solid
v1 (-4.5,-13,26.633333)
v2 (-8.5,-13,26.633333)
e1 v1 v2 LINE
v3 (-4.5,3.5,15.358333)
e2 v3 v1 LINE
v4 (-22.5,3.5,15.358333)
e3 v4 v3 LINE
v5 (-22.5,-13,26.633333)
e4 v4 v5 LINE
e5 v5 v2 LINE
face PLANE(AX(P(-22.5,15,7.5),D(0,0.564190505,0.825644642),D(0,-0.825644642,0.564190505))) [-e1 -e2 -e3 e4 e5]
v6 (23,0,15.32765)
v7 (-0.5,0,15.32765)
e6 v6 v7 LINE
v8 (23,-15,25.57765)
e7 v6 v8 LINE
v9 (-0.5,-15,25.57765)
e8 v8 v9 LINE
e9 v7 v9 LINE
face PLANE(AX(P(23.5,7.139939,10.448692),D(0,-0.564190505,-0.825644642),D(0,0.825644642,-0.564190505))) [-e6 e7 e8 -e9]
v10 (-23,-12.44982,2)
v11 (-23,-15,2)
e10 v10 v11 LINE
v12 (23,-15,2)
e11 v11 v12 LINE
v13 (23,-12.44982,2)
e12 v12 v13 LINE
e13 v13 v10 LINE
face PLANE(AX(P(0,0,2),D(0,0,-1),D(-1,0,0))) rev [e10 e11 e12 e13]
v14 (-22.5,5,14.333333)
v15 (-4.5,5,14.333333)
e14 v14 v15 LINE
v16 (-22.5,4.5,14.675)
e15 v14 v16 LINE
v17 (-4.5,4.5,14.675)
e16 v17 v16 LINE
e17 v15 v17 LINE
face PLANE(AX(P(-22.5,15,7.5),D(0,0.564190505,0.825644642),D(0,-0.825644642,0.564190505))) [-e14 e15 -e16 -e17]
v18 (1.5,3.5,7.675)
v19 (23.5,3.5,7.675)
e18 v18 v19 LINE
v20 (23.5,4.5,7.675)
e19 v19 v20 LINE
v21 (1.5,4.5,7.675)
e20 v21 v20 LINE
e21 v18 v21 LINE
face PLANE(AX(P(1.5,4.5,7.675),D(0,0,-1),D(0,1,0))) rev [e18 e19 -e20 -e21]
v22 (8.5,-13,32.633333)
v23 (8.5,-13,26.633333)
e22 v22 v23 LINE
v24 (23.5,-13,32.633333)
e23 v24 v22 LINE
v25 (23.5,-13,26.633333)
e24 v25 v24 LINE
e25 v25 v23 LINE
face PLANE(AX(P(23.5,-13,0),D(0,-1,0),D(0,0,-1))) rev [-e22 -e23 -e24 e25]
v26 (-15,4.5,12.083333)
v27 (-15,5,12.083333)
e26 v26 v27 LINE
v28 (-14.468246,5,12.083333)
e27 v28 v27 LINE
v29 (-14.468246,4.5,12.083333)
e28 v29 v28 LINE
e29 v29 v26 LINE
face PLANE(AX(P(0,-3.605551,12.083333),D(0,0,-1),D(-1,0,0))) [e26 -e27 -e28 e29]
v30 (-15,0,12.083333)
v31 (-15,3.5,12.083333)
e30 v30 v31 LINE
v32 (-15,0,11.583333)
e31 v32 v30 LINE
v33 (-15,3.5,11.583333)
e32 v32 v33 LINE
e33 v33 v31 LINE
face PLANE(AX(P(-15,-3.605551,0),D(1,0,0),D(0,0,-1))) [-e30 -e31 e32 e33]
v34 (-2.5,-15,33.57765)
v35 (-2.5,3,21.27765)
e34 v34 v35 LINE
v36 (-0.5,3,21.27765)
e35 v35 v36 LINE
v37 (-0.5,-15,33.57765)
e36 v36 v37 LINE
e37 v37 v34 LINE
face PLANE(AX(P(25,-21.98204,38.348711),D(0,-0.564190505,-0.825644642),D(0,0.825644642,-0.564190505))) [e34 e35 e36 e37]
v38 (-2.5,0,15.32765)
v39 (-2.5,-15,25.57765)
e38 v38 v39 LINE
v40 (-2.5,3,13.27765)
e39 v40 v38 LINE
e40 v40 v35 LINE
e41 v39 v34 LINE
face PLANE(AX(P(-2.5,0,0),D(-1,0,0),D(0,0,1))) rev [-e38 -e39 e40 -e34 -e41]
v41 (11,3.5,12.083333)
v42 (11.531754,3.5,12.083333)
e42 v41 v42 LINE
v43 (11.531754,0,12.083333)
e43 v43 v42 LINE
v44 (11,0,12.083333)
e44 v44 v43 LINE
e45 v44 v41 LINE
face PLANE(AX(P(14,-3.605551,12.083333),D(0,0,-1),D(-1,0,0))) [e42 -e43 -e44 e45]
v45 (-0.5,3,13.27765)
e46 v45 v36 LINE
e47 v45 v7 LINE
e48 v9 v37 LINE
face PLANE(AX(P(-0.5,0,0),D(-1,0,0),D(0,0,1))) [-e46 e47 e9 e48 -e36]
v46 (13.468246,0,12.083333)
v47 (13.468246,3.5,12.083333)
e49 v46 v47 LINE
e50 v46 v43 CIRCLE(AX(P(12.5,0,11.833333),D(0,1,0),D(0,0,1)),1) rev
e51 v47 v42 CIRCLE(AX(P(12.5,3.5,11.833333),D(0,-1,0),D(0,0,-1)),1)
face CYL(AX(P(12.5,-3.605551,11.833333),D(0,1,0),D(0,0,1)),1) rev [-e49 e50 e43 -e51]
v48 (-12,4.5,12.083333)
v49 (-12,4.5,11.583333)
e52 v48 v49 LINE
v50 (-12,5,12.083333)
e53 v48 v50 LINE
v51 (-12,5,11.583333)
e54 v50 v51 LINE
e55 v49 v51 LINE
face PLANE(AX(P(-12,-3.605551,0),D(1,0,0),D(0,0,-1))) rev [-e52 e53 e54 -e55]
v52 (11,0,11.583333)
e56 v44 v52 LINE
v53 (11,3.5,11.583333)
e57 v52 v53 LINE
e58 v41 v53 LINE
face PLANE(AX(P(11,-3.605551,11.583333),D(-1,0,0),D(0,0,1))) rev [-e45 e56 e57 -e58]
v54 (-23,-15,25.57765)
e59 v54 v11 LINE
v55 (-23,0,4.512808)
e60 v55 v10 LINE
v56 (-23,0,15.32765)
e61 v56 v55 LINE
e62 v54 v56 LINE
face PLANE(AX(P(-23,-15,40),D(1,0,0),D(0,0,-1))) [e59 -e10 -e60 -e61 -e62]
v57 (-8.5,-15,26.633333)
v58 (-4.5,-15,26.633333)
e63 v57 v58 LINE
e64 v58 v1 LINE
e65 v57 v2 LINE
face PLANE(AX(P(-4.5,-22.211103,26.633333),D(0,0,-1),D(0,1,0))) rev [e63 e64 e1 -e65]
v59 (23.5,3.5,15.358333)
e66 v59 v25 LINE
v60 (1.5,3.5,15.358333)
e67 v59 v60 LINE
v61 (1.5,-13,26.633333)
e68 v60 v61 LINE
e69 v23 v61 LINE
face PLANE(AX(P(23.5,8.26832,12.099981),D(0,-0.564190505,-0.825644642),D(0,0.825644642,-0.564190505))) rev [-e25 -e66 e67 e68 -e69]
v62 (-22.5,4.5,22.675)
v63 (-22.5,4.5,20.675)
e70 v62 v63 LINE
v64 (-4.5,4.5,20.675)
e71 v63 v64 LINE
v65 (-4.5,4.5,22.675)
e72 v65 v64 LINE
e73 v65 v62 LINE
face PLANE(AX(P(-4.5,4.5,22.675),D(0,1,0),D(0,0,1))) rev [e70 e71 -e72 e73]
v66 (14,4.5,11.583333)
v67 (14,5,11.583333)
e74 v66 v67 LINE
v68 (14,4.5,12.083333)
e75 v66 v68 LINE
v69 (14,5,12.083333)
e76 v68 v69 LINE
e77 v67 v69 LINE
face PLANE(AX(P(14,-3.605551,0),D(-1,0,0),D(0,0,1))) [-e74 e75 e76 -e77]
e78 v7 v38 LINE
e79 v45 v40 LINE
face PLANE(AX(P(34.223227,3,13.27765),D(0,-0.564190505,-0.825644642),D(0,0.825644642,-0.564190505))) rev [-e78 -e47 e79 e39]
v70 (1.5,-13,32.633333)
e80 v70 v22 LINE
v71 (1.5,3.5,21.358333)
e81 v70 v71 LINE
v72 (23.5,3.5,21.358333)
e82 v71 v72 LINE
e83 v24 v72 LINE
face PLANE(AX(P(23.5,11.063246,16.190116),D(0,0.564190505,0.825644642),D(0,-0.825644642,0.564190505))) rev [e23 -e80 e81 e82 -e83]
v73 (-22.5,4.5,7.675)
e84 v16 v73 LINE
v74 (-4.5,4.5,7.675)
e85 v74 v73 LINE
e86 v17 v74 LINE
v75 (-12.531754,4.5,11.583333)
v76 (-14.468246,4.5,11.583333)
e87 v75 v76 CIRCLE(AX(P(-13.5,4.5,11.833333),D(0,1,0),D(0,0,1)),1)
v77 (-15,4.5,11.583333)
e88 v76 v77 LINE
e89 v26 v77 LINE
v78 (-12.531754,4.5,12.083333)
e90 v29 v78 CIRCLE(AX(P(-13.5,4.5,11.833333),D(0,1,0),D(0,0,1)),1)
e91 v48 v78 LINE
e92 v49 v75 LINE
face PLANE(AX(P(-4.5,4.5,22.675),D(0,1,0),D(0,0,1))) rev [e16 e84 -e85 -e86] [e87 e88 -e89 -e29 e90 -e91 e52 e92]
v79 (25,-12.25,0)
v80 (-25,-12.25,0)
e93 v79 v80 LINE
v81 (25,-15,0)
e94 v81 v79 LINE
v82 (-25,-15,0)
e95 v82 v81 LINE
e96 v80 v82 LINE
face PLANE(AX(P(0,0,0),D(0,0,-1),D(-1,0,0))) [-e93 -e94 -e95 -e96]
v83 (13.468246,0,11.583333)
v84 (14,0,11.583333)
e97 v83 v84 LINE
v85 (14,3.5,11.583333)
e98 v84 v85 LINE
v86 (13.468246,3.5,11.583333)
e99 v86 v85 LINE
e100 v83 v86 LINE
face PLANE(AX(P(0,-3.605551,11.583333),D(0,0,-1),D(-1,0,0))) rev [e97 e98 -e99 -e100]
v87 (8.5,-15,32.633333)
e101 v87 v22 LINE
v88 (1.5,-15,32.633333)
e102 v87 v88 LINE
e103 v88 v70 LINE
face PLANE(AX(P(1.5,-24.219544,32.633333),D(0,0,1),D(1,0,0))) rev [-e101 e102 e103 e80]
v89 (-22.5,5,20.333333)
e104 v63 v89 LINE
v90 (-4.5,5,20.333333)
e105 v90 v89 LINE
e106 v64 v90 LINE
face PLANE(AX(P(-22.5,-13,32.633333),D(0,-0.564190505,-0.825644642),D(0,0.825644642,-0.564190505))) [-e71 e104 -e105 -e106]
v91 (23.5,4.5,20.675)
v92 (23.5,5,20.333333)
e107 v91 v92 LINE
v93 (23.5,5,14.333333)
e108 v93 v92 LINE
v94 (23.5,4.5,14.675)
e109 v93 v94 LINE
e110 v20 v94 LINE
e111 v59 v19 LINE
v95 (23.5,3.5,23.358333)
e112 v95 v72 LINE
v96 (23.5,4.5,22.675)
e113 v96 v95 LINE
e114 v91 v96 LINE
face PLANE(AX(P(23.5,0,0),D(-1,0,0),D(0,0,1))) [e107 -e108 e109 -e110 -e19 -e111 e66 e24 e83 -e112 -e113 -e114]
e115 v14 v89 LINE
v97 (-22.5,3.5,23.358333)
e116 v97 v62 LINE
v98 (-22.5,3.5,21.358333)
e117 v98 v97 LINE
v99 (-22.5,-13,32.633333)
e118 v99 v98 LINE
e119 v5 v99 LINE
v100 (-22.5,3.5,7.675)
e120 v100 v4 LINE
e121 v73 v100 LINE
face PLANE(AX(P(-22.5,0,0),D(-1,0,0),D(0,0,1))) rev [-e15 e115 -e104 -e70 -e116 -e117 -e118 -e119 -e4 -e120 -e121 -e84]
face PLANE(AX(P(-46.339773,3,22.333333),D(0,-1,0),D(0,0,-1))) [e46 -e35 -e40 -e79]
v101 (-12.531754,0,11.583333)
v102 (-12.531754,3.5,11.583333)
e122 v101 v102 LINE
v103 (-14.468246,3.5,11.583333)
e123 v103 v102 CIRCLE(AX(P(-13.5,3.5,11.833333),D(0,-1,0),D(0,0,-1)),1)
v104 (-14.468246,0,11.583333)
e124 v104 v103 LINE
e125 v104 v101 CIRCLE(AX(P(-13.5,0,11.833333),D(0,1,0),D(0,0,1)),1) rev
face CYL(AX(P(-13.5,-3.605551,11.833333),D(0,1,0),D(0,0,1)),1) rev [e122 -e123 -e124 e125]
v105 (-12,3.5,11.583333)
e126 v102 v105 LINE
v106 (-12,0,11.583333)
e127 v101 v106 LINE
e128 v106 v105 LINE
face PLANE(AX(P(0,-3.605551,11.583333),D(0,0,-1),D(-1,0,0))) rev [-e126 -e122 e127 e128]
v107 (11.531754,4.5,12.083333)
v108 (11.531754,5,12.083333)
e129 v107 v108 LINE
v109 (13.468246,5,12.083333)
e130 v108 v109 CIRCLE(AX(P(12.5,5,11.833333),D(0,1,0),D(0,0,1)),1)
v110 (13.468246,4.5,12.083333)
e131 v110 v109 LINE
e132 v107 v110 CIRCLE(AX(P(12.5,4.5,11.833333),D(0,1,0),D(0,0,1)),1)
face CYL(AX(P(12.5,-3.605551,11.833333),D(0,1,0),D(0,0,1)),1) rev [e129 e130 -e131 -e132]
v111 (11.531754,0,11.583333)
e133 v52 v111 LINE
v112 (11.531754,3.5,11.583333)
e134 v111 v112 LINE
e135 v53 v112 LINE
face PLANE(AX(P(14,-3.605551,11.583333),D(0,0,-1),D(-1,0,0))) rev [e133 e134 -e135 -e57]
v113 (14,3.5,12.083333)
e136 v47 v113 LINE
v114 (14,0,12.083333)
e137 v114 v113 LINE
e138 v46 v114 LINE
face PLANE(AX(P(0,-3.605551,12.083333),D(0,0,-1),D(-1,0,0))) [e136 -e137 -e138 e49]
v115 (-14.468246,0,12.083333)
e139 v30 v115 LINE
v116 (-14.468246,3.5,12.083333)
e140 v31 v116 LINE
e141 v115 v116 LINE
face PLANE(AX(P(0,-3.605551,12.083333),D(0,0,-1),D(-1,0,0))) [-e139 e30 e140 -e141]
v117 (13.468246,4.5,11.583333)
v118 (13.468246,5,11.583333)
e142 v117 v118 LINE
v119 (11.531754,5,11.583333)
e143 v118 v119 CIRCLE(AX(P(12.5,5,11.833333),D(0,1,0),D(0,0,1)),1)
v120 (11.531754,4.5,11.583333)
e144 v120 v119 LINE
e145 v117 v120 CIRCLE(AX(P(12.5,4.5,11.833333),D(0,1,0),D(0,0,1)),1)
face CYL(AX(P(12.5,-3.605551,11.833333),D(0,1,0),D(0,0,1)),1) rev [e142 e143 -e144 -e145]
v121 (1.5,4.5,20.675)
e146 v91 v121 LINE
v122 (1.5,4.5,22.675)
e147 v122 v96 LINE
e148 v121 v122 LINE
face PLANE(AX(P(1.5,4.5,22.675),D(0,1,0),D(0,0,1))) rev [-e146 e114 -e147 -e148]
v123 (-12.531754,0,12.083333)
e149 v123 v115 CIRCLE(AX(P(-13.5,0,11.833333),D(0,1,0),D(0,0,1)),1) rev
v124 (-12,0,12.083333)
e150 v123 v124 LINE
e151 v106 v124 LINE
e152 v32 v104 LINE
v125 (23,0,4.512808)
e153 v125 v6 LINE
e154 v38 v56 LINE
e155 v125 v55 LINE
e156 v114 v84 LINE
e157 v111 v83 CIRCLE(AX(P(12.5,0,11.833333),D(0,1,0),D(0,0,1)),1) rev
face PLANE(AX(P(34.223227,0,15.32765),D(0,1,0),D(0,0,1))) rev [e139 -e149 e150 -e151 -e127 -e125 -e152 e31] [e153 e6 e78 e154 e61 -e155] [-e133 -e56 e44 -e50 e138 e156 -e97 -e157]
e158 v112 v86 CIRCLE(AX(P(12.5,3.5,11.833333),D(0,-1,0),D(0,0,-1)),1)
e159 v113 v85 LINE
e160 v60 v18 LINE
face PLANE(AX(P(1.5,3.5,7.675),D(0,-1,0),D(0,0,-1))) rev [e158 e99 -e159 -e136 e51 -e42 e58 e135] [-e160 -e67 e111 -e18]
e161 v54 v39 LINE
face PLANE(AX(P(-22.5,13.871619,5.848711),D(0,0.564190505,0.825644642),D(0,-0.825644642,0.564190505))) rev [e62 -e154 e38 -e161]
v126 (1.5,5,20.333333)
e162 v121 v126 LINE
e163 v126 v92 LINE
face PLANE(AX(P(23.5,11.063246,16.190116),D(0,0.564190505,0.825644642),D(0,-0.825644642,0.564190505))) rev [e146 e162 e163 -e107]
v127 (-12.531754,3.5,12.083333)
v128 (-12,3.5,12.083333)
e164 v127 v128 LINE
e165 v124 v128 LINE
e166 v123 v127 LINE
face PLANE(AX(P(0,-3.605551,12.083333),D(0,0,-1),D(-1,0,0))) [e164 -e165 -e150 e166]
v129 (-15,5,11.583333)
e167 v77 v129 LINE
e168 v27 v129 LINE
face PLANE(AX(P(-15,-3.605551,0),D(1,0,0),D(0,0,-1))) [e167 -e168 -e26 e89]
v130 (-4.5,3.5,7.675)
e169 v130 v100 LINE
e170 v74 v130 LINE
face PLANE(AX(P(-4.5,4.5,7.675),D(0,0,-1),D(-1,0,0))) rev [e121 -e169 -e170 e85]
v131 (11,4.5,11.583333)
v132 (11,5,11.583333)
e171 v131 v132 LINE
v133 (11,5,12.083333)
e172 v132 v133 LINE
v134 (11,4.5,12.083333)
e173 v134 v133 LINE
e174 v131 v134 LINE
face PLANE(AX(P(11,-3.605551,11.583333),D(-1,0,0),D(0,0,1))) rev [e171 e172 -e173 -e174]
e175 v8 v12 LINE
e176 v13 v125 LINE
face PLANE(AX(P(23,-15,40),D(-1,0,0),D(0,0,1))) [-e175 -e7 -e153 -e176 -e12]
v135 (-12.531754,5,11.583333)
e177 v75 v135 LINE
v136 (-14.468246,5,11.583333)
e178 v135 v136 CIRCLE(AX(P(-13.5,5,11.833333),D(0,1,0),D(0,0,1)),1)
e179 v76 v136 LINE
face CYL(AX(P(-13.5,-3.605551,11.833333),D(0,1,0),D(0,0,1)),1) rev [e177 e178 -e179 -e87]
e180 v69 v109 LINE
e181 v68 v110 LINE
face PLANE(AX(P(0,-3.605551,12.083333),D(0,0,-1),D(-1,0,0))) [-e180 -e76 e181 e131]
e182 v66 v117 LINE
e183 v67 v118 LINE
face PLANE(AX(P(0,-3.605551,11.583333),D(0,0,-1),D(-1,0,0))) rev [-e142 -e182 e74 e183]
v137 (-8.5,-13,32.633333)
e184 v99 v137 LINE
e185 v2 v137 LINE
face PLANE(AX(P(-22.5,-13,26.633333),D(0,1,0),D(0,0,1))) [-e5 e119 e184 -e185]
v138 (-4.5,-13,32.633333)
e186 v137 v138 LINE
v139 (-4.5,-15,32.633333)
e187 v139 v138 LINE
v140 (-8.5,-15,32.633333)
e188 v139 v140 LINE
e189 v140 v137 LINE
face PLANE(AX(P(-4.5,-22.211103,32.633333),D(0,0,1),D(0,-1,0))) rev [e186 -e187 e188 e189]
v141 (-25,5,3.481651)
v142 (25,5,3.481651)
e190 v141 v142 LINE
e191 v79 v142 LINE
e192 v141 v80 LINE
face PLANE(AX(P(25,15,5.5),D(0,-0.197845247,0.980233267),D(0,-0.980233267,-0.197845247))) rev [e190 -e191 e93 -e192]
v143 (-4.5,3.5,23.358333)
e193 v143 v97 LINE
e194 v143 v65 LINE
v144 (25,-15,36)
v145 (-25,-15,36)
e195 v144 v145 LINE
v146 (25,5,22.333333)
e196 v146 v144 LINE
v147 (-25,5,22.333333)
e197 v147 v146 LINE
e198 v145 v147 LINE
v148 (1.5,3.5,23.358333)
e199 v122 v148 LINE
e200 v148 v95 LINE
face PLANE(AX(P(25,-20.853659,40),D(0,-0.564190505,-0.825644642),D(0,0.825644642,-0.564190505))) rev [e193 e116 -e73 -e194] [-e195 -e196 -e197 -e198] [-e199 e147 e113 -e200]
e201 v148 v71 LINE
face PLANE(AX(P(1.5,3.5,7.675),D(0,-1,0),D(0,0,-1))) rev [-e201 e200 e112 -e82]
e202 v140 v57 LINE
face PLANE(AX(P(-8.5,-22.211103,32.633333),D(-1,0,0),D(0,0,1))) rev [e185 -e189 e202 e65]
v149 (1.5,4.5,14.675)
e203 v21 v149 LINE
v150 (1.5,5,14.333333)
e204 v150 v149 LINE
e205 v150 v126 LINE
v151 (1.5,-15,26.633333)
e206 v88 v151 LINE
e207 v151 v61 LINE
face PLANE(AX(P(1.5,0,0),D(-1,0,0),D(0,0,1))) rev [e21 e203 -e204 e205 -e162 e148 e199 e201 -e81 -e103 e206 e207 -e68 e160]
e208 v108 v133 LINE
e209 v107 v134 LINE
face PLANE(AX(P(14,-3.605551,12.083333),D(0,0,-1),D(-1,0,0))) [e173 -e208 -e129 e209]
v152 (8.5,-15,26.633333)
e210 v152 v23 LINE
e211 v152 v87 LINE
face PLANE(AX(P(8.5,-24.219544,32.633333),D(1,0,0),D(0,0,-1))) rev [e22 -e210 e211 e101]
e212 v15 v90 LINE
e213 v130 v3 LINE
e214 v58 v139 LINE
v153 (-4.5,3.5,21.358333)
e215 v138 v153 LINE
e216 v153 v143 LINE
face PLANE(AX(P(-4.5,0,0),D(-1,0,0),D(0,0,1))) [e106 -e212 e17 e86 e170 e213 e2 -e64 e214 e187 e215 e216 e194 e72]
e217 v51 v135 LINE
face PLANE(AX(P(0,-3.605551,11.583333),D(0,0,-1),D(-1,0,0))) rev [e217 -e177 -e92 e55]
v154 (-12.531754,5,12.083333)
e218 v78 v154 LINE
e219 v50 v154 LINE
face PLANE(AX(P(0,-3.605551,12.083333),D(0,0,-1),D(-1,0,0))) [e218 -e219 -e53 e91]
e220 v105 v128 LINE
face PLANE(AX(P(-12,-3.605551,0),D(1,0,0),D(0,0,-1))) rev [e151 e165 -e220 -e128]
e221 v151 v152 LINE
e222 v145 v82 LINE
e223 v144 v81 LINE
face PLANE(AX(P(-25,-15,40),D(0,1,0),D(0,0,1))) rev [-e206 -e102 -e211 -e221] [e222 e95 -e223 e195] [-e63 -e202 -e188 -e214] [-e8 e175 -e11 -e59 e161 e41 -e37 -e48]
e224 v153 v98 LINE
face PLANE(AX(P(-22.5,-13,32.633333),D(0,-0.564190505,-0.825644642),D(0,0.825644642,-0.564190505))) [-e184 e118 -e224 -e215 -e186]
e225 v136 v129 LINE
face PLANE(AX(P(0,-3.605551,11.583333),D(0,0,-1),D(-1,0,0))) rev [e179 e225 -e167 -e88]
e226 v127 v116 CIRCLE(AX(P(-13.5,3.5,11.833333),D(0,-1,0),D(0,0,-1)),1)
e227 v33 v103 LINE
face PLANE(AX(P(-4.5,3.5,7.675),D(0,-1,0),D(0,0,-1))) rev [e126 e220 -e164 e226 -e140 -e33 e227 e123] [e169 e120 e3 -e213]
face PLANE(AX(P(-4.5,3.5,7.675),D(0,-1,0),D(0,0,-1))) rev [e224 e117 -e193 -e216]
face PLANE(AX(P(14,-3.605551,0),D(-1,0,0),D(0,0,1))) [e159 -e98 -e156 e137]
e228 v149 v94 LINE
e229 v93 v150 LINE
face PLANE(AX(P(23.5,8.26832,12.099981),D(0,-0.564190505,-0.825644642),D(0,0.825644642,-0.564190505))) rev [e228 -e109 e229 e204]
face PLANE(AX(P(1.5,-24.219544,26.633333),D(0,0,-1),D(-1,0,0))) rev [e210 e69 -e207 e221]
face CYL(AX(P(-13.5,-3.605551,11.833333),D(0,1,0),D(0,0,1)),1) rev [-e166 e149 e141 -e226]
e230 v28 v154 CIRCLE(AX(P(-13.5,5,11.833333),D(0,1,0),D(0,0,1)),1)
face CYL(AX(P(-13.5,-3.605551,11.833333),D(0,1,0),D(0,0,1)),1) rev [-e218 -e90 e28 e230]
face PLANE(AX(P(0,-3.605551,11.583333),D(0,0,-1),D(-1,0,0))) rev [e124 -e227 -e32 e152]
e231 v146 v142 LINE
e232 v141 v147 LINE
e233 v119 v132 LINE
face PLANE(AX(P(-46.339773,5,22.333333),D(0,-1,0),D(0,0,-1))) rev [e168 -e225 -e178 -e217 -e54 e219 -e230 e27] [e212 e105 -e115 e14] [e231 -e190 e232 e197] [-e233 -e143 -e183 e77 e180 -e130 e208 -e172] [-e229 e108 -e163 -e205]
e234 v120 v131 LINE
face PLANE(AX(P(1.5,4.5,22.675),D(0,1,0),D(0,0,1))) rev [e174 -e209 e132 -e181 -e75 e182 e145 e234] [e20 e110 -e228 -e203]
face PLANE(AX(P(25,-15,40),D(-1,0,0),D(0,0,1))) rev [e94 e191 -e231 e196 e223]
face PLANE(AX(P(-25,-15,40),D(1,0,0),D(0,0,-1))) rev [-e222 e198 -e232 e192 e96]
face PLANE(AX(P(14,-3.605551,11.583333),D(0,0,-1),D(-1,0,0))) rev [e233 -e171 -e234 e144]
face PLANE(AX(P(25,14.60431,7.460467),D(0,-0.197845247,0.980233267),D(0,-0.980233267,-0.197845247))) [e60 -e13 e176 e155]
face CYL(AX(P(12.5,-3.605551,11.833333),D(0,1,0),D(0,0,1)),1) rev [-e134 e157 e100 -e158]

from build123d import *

# Parameters (mm, degrees)
SKIZZE1_W                            = 50
SKIZZE1_H                            = 30
AUFSATZ_LINEAR_AUSTRAGEN1_DEPTH      = 40
FPV_SENDER_START                     = -1.5
FPV_SENDER_DEPTH                     = 22
EMPF_NGER_START                      = 4.5
EMPF_NGER_DEPTH                      = 18
SCHNITT_LINEAR_AUSTRAGEN3_DEPTH      = 66.76473219
SCHNITT_LINEAR_AUSTRAGEN3_DEPTH_BACK = 66.76473219
SCHNITT_LINEAR_AUSTRAGEN5_REACH      = 65.411
WANDUNG2_START                       = -23
WANDUNG2_DEPTH                       = 46
WANDUNG2_START_2                     = -2.5
WANDUNG2_2_DEPTH                     = 2
SKIZZE6_W                            = 7
SKIZZE6_H                            = 6
SCHNITT_LINEAR_AUSTRAGEN4_DEPTH      = 2
SKIZZE8_W                            = 4
SKIZZE8_H                            = 6
SCHNITT_LINEAR_AUSTRAGEN7_DEPTH      = 2
SCHNITT_LINEAR_START                 = -2.5
SCHNITT_LINEAR_AUSTRAGEN8_DEPTH      = 18
SCHNITT_LINEAR_START_2               = -1.5
SCHNITT_LINEAR_AUSTRAGEN9_DEPTH      = 22
AUFSATZ_LINEAR_AUSTRAGEN2_REACH      = 63.847
SCHNITT_LINEAR_AUSTRAGEN10_REACH     = 50.177
SKIZZE11_R                           = 1
SKIZZE11_W                           = 3
SKIZZE11_H                           = 0.5


# Read off the part's stored shape, not the designer's step: Wandung2
with BuildPart() as part:
    # Skizze1 → Aufsatz-Linear austragen1 (new body)
    with BuildSketch(Plane.XY):
        Rectangle(SKIZZE1_W, SKIZZE1_H)
    extrude(amount=AUFSATZ_LINEAR_AUSTRAGEN1_DEPTH)

    # Skizze2 → FPV_Sender (cut)
    with BuildSketch(Plane.ZY.offset(FPV_SENDER_START)):
        Polygon((13.5, 15), (7.5, 15), (26.633333333, -13), (32.633333333, -13), align=None)
    extrude(amount=-FPV_SENDER_DEPTH, mode=Mode.SUBTRACT)

    # Skizze4 → Empfänger (cut)
    with BuildSketch(Plane.ZY.offset(EMPF_NGER_START)):
        Polygon((13.5, 15), (7.5, 15), (26.633333333, -13), (32.633333333, -13), align=None)
    extrude(amount=EMPF_NGER_DEPTH, mode=Mode.SUBTRACT)

    # Skizze5 → Schnitt-Linear austragen3 (cut, two sides: drawn at the far end of the back side and taken through both)
    with BuildSketch(Plane.ZY.offset(25).offset(-SCHNITT_LINEAR_AUSTRAGEN3_DEPTH_BACK)):
        Polygon((15.5, 15), (40, 15), (40, -20.853658537), align=None)
        Polygon((5.5, 15), (0, -12.25), (0, 15), align=None)
    extrude(amount=SCHNITT_LINEAR_AUSTRAGEN3_DEPTH + SCHNITT_LINEAR_AUSTRAGEN3_DEPTH_BACK, mode=Mode.SUBTRACT)

    # Schnitt-Linear austragen5: up to this face of the body (flat: up to its plane)
    schnitt_linear_austragen5_end = Plane(part.part.faces().sort_by_distance((-25, -2.83971717, 14.814249022))[0])
    # Skizze7 → Schnitt-Linear austragen5 (cut, up to the picked face)
    with BuildSketch(Plane(origin=(25, 0, 0), x_dir=(0, 0, -1), z_dir=(1, 0, 0)), mode=Mode.PRIVATE) as schnitt_linear_austragen5_sk1:
        Polygon((-5.5, 15), (-15.5, 15), (-22.333333333, 5), (-3.481651376, 5), align=None)
    schnitt_linear_austragen5_tool1 = split(extrude(schnitt_linear_austragen5_sk1.sketch, amount=-SCHNITT_LINEAR_AUSTRAGEN5_REACH, mode=Mode.PRIVATE), bisect_by=schnitt_linear_austragen5_end, keep=Keep.BOTH, mode=Mode.PRIVATE)
    add(schnitt_linear_austragen5_tool1.solids().sort_by(Axis((25, 9.488667, 11.826849), (-1, 0, 0)))[0], mode=Mode.SUBTRACT)

    # Wandung2 outline → Wandung2 (cut)
    with BuildSketch(Plane.YZ.offset(WANDUNG2_START)):
        Polygon((3, 13.27765036), (-15, 25.57765036), (-15, 2), (-12.449820142, 2), (3, 5.118312322), align=None)
    extrude(amount=WANDUNG2_DEPTH, mode=Mode.SUBTRACT)

    # Wandung2 2 outline → Wandung2 2 (cut)
    with BuildSketch(Plane.YZ.offset(WANDUNG2_START_2)):
        Polygon((-15, 33.57765036), (-15, 25.57765036), (3, 13.27765036), (3, 21.27765036), align=None)
    extrude(amount=WANDUNG2_2_DEPTH, mode=Mode.SUBTRACT)

    # Skizze6 → Schnitt-Linear austragen4 (cut)
    with BuildSketch(Plane(origin=(0, -13, 0), x_dir=(1, 0, 0), z_dir=(0, 1, 0))):
        with Locations((5, -29.633333333)):
            Rectangle(SKIZZE6_W, SKIZZE6_H)
    extrude(amount=-SCHNITT_LINEAR_AUSTRAGEN4_DEPTH, mode=Mode.SUBTRACT)

    # Skizze8 → Schnitt-Linear austragen7 (cut)
    with BuildSketch(Plane(origin=(0, -13, 0), x_dir=(1, 0, 0), z_dir=(0, 1, 0))):
        with Locations((-6.5, -29.633333333)):
            Rectangle(SKIZZE8_W, SKIZZE8_H)
    extrude(amount=-SCHNITT_LINEAR_AUSTRAGEN7_DEPTH, mode=Mode.SUBTRACT)

    # Skizze9 → Schnitt-Linear austragen8 (cut)
    with BuildSketch(Plane.ZY.offset(25).offset(SCHNITT_LINEAR_START)):
        Polygon((22.675, 4.5), (7.675, 4.5), (7.675, 3.5), (23.358333333, 3.5), align=None)
    extrude(amount=-SCHNITT_LINEAR_AUSTRAGEN8_DEPTH, mode=Mode.SUBTRACT)

    # Skizze10 → Schnitt-Linear austragen9 (cut)
    with BuildSketch(Plane(origin=(25, 0, 0), x_dir=(0, 0, -1), z_dir=(1, 0, 0)).offset(SCHNITT_LINEAR_START_2)):
        Polygon((-22.675, 4.5), (-7.675, 4.5), (-7.675, 3.5), (-23.358333333, 3.5), align=None)
    extrude(amount=-SCHNITT_LINEAR_AUSTRAGEN9_DEPTH, mode=Mode.SUBTRACT)

    # Aufsatz-Linear austragen2: up to this face of the body (flat: up to its plane)
    aufsatz_linear_austragen2_end = Plane(part.part.faces().sort_by_distance((23, -7.466953152, 11.743949806))[0])
    # Skizze12 → Aufsatz-Linear austragen2 (add, up to the picked face)
    with BuildSketch(Plane(origin=(-23, 0, 0), x_dir=(0, 0, -1), z_dir=(1, 0, 0)), mode=Mode.PRIVATE) as aufsatz_linear_austragen2_sk1:
        Polygon((-5.118312322, 3), (-13.27765036, 3), (-15.32765036, 0), (-4.512807735, 0), align=None)
    aufsatz_linear_austragen2_tool1 = split(extrude(aufsatz_linear_austragen2_sk1.sketch, amount=AUFSATZ_LINEAR_AUSTRAGEN2_REACH, mode=Mode.PRIVATE), bisect_by=aufsatz_linear_austragen2_end, keep=Keep.BOTH, mode=Mode.PRIVATE)
    add(aufsatz_linear_austragen2_tool1.solids().sort_by(Axis((-23, 1.430023, 9.575952), (1, 0, 0)))[0])

    # Schnitt-Linear austragen10: up to this face of the body (flat: up to its plane)
    schnitt_linear_austragen10_end = Plane(part.part.faces().sort_by_distance((0, 0, 9.920229048))[0])
    # Skizze11 → Schnitt-Linear austragen10 (cut, up to the picked face)
    with BuildSketch(Plane(origin=(0, 5, 0), x_dir=(1, 0, 0), z_dir=(0, 1, 0)), mode=Mode.PRIVATE) as schnitt_linear_austragen10_sk1:
        with Locations((12.5, -11.833333333)):
            Circle(SKIZZE11_R)
    schnitt_linear_austragen10_tool1 = split(extrude(schnitt_linear_austragen10_sk1.sketch, amount=-SCHNITT_LINEAR_AUSTRAGEN10_REACH, mode=Mode.PRIVATE), bisect_by=schnitt_linear_austragen10_end, keep=Keep.BOTH, mode=Mode.PRIVATE)
    # Skizze11 → Schnitt-Linear austragen10 (cut, up to the picked face)
    with BuildSketch(Plane(origin=(0, 5, 0), x_dir=(1, 0, 0), z_dir=(0, 1, 0)), mode=Mode.PRIVATE) as schnitt_linear_austragen10_sk2:
        with Locations((-13.5, -11.833333333)):
            Circle(SKIZZE11_R)
    schnitt_linear_austragen10_tool2 = split(extrude(schnitt_linear_austragen10_sk2.sketch, amount=-SCHNITT_LINEAR_AUSTRAGEN10_REACH, mode=Mode.PRIVATE), bisect_by=schnitt_linear_austragen10_end, keep=Keep.BOTH, mode=Mode.PRIVATE)
    # Skizze11 → Schnitt-Linear austragen10 (cut, up to the picked face)
    with BuildSketch(Plane(origin=(0, 5, 0), x_dir=(1, 0, 0), z_dir=(0, 1, 0)), mode=Mode.PRIVATE) as schnitt_linear_austragen10_sk3:
        with Locations((12.5, -11.833333333)):
            Rectangle(SKIZZE11_W, SKIZZE11_H)
    schnitt_linear_austragen10_tool3 = split(extrude(schnitt_linear_austragen10_sk3.sketch, amount=-SCHNITT_LINEAR_AUSTRAGEN10_REACH, mode=Mode.PRIVATE), bisect_by=schnitt_linear_austragen10_end, keep=Keep.BOTH, mode=Mode.PRIVATE)
    # Skizze11 → Schnitt-Linear austragen10 (cut, up to the picked face)
    with BuildSketch(Plane(origin=(0, 5, 0), x_dir=(1, 0, 0), z_dir=(0, 1, 0)), mode=Mode.PRIVATE) as schnitt_linear_austragen10_sk4:
        with Locations((-13.5, -11.833333333)):
            Rectangle(SKIZZE11_W, SKIZZE11_H)
    schnitt_linear_austragen10_tool4 = split(extrude(schnitt_linear_austragen10_sk4.sketch, amount=-SCHNITT_LINEAR_AUSTRAGEN10_REACH, mode=Mode.PRIVATE), bisect_by=schnitt_linear_austragen10_end, keep=Keep.BOTH, mode=Mode.PRIVATE)
    add(schnitt_linear_austragen10_tool1.solids().sort_by(Axis((12.5, 5, 11.833333), (0, -1, 0)))[0], mode=Mode.SUBTRACT)
    add(schnitt_linear_austragen10_tool2.solids().sort_by(Axis((-13.5, 5, 11.833333), (0, -1, 0)))[0], mode=Mode.SUBTRACT)
    add(schnitt_linear_austragen10_tool3.solids().sort_by(Axis((12.5, 5, 11.833333), (0, -1, 0)))[0], mode=Mode.SUBTRACT)
    add(schnitt_linear_austragen10_tool4.solids().sort_by(Axis((-13.5, 5, 11.833333), (0, -1, 0)))[0], mode=Mode.SUBTRACT)


solid = part.part
